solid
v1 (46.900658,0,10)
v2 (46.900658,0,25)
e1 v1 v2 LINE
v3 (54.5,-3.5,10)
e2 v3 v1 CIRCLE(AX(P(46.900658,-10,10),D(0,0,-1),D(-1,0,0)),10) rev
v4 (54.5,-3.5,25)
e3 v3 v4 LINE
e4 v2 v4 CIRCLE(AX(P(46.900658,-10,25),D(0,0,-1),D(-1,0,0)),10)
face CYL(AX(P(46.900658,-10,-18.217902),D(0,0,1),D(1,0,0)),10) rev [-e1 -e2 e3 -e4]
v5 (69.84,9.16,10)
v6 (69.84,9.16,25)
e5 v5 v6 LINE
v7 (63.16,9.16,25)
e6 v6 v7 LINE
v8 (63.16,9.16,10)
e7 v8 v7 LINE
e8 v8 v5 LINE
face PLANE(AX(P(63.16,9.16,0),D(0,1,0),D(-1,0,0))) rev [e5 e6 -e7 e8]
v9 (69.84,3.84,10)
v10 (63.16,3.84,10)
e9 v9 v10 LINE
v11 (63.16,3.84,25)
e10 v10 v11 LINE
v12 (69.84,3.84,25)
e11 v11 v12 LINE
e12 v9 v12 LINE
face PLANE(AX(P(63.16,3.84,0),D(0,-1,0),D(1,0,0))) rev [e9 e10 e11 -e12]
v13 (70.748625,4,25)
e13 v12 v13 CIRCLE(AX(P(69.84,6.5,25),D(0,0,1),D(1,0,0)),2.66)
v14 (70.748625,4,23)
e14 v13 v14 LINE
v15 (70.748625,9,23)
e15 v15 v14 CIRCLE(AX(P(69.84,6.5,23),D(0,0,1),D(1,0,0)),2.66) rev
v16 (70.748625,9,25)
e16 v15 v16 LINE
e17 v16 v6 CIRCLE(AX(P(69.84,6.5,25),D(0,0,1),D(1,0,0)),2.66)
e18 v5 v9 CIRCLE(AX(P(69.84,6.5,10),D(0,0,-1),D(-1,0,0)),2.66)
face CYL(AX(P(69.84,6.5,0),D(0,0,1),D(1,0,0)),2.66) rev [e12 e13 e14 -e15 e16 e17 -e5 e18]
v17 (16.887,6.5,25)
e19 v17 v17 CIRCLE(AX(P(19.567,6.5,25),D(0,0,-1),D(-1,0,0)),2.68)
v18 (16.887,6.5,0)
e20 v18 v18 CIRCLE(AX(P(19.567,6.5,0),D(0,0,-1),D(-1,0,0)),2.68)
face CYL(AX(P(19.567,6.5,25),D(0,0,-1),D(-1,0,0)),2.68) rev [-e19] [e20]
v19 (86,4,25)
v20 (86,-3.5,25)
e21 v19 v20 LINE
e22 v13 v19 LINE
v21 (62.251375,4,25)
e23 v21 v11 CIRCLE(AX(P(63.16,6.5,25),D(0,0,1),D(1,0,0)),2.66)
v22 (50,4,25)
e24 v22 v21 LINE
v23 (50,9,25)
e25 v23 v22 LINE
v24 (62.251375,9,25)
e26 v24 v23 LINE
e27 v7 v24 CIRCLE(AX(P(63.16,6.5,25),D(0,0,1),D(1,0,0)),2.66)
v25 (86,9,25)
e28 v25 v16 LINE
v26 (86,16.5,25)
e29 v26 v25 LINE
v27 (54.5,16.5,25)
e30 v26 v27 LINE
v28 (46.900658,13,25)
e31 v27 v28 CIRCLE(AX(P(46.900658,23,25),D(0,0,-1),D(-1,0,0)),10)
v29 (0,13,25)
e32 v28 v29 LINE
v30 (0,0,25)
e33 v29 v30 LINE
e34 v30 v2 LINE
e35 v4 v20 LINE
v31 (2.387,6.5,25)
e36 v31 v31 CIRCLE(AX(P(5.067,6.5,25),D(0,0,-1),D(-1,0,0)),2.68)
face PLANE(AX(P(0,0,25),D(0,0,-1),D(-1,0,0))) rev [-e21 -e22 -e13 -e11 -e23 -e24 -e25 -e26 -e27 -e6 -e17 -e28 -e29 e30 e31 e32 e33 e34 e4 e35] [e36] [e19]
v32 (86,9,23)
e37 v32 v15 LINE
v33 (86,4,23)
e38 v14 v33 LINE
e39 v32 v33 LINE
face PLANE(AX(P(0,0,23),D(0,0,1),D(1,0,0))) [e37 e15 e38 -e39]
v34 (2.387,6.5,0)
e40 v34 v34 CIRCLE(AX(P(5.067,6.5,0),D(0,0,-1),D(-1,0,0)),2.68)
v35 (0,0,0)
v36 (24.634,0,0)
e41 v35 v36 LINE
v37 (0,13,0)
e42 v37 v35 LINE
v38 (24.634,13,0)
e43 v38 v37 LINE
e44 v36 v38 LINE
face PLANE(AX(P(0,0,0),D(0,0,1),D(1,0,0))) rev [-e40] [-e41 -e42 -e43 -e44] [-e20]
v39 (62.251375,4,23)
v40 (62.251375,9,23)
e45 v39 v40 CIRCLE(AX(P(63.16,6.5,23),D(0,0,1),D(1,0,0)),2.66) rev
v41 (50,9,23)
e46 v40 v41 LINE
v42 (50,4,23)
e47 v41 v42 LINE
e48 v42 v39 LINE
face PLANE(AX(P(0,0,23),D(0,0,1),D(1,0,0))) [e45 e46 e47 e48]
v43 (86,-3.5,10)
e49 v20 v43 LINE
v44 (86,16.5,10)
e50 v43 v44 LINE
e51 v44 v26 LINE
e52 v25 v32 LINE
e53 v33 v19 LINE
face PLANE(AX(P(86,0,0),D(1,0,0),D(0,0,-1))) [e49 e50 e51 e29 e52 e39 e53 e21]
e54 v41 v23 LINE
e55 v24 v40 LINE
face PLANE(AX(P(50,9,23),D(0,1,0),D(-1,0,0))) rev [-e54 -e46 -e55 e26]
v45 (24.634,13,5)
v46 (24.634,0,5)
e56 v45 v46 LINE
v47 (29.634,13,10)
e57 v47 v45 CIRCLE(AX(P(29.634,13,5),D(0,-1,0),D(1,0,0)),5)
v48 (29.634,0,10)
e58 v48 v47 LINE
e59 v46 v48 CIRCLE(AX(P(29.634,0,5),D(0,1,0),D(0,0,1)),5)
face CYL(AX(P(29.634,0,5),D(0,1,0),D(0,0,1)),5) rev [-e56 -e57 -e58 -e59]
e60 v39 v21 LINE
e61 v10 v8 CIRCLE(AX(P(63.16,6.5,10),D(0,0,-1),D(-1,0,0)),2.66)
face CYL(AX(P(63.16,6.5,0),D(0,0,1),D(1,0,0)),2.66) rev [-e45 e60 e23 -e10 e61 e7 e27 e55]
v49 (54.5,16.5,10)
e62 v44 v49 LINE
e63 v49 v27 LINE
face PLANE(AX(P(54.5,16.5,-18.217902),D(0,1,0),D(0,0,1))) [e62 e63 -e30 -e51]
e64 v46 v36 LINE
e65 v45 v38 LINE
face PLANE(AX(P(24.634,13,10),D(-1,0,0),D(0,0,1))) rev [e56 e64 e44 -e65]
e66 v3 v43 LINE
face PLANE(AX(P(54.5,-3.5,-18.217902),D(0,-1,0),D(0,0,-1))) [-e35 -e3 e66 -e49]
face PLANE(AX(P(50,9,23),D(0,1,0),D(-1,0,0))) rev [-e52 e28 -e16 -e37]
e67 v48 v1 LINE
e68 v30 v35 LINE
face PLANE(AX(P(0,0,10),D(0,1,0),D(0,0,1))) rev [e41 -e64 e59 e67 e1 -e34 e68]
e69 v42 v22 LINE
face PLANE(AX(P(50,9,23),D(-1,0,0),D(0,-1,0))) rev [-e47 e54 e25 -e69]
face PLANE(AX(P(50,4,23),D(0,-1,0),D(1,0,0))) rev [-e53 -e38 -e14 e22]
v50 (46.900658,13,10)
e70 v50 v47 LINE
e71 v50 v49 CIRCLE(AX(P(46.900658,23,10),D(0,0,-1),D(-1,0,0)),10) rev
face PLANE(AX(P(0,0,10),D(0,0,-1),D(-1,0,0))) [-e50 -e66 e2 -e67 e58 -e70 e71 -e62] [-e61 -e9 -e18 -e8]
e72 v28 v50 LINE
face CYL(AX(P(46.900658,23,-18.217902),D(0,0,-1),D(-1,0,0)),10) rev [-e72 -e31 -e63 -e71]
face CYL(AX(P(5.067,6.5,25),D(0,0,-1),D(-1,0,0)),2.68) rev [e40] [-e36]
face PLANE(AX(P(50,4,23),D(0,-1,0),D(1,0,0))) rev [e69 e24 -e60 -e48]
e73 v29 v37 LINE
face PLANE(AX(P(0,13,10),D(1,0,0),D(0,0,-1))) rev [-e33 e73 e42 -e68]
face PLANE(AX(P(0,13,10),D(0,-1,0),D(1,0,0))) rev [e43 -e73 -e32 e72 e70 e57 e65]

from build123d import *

# Parameters (mm, degrees)
SKETCH1_W           = 24.634
SKETCH1_H           = 13
BOSS_EXTRUDE1_DEPTH = 10
SKETCH4_W           = 82.5
SKETCH4_H           = 13
BOSS_EXTRUDE4_DEPTH = 15
SKETCH5_W           = 28
SKETCH5_H           = 3.5
BOSS_EXTRUDE5_DEPTH = 15
CUT_EXTRUDE1_DEPTH  = 88.769584709
SKETCH7_W           = 32.5
SKETCH7_H           = 5
CUT_EXTRUDE2_DEPTH  = 2
SKETCH11_R          = 2.68
CUT_EXTRUDE3_DEPTH  = 88.769584709
FILLET1_R           = 10
FILLET2_R           = 5
BOSS_EXTRUDE6_DEPTH = 3.5


with BuildPart() as part:
    # Sketch1 → Boss-Extrude1 (new body)
    with BuildSketch(Plane.XY):
        with Locations((12.317, 6.5)):
            Rectangle(SKETCH1_W, SKETCH1_H)
    extrude(amount=BOSS_EXTRUDE1_DEPTH)

    # Sketch4 → Boss-Extrude4 (add)
    with BuildSketch(Plane.XY.offset(10)):
        with Locations((41.25, 6.5)):
            Rectangle(SKETCH4_W, SKETCH4_H)
    extrude(amount=BOSS_EXTRUDE4_DEPTH)

    # Sketch5 → Boss-Extrude5 (add)
    with BuildSketch(Plane.XY.offset(25)):
        with Locations((68.5, -1.75)):
            Rectangle(SKETCH5_W, SKETCH5_H)
        with Locations((68.5, 14.75)):
            Rectangle(SKETCH5_W, SKETCH5_H)
    extrude(amount=-BOSS_EXTRUDE5_DEPTH)

    # Sketch6 → Cut-Extrude1 (cut, through all)
    with BuildSketch(Plane.XY.offset(25)):
        with BuildLine():
            Line((63.16, 9.16), (69.84, 9.16))
            ThreePointArc((69.84, 9.16), (72.5, 6.5), (69.84, 3.84))
            Line((69.84, 3.84), (63.16, 3.84))
            ThreePointArc((63.16, 3.84), (60.5, 6.5), (63.16, 9.16))
        make_face()
    extrude(amount=-CUT_EXTRUDE1_DEPTH, mode=Mode.SUBTRACT)

    # Sketch7 → Cut-Extrude2 (cut)
    with BuildSketch(Plane.XY.offset(25)):
        with Locations((66.25, 6.5)):
            Rectangle(SKETCH7_W, SKETCH7_H)
    extrude(amount=-CUT_EXTRUDE2_DEPTH, mode=Mode.SUBTRACT)

    # Sketch11 → Cut-Extrude3 (cut, through all)
    with BuildSketch(Plane(origin=(0, 0, 0), x_dir=(-1, 0, 0), z_dir=(0, 0, -1))):
        with Locations((-5.067, 6.5)):
            Circle(SKETCH11_R)
        with Locations((-19.567, 6.5)):
            Circle(SKETCH11_R)
    extrude(amount=-CUT_EXTRUDE3_DEPTH, mode=Mode.SUBTRACT)

    # Fillet1
    # the kernel refuses this fillet: 10 mm, written as the material it adds along each edge
    with BuildSketch(Plane(origin=(54.5, 13, 25), x_dir=(-1, 0, 0), z_dir=(0, 0, -1))) as fillet1_piece_1:
        with BuildLine():
            CenterArc((7.599342077, 10), FILLET1_R, 220.541601874, 49.458398126)
            Line((0, 3.5), (-0.151986842, 3.37))
            ThreePointArc((-0.151986842, 3.37), (-0.2, 1.75), (-0.2, 0))
            Line((-0.2, 0), (0, -0.2))
            Line((0, -0.2), (7.599342077, -0.2))
            Line((7.599342077, -0.2), (7.599342077, 0))
        make_face()
    extrude(amount=15)
    with BuildSketch(Plane(origin=(54.5, 0, 25), x_dir=(-1, 0, 0), z_dir=(0, 0, -1))) as fillet1_piece_2:
        with BuildLine():
            CenterArc((7.599342077, -10), FILLET1_R, 90, 49.458398126)
            Line((0, -3.5), (-0.151986842, -3.37))
            ThreePointArc((-0.151986842, -3.37), (-0.2, -1.75), (-0.2, 0))
            Line((-0.2, 0), (0, 0.2))
            Line((0, 0.2), (7.599342077, 0.2))
            Line((7.599342077, 0.2), (7.599342077, 0))
        make_face()
    extrude(amount=15)

    # Fillet2
    fillet2_edges = [part.edges().sort_by_distance(p)[0] for p in [
        (24.634, 6.5, 10),
    ]]
    fillet(fillet2_edges, radius=FILLET2_R)

    # Sketch12 → Boss-Extrude6 (add)
    with BuildSketch(Plane(origin=(82.5, 0, 0), x_dir=(0, 0, -1), z_dir=(1, 0, 0))):
        Polygon((-25, 16.5), (-25, 9), (-23, 9), (-23, 4), (-25, 4), (-25, -3.5), (-10, -3.5), (-10, 16.5), align=None)
    extrude(amount=BOSS_EXTRUDE6_DEPTH)


solid = part.part
